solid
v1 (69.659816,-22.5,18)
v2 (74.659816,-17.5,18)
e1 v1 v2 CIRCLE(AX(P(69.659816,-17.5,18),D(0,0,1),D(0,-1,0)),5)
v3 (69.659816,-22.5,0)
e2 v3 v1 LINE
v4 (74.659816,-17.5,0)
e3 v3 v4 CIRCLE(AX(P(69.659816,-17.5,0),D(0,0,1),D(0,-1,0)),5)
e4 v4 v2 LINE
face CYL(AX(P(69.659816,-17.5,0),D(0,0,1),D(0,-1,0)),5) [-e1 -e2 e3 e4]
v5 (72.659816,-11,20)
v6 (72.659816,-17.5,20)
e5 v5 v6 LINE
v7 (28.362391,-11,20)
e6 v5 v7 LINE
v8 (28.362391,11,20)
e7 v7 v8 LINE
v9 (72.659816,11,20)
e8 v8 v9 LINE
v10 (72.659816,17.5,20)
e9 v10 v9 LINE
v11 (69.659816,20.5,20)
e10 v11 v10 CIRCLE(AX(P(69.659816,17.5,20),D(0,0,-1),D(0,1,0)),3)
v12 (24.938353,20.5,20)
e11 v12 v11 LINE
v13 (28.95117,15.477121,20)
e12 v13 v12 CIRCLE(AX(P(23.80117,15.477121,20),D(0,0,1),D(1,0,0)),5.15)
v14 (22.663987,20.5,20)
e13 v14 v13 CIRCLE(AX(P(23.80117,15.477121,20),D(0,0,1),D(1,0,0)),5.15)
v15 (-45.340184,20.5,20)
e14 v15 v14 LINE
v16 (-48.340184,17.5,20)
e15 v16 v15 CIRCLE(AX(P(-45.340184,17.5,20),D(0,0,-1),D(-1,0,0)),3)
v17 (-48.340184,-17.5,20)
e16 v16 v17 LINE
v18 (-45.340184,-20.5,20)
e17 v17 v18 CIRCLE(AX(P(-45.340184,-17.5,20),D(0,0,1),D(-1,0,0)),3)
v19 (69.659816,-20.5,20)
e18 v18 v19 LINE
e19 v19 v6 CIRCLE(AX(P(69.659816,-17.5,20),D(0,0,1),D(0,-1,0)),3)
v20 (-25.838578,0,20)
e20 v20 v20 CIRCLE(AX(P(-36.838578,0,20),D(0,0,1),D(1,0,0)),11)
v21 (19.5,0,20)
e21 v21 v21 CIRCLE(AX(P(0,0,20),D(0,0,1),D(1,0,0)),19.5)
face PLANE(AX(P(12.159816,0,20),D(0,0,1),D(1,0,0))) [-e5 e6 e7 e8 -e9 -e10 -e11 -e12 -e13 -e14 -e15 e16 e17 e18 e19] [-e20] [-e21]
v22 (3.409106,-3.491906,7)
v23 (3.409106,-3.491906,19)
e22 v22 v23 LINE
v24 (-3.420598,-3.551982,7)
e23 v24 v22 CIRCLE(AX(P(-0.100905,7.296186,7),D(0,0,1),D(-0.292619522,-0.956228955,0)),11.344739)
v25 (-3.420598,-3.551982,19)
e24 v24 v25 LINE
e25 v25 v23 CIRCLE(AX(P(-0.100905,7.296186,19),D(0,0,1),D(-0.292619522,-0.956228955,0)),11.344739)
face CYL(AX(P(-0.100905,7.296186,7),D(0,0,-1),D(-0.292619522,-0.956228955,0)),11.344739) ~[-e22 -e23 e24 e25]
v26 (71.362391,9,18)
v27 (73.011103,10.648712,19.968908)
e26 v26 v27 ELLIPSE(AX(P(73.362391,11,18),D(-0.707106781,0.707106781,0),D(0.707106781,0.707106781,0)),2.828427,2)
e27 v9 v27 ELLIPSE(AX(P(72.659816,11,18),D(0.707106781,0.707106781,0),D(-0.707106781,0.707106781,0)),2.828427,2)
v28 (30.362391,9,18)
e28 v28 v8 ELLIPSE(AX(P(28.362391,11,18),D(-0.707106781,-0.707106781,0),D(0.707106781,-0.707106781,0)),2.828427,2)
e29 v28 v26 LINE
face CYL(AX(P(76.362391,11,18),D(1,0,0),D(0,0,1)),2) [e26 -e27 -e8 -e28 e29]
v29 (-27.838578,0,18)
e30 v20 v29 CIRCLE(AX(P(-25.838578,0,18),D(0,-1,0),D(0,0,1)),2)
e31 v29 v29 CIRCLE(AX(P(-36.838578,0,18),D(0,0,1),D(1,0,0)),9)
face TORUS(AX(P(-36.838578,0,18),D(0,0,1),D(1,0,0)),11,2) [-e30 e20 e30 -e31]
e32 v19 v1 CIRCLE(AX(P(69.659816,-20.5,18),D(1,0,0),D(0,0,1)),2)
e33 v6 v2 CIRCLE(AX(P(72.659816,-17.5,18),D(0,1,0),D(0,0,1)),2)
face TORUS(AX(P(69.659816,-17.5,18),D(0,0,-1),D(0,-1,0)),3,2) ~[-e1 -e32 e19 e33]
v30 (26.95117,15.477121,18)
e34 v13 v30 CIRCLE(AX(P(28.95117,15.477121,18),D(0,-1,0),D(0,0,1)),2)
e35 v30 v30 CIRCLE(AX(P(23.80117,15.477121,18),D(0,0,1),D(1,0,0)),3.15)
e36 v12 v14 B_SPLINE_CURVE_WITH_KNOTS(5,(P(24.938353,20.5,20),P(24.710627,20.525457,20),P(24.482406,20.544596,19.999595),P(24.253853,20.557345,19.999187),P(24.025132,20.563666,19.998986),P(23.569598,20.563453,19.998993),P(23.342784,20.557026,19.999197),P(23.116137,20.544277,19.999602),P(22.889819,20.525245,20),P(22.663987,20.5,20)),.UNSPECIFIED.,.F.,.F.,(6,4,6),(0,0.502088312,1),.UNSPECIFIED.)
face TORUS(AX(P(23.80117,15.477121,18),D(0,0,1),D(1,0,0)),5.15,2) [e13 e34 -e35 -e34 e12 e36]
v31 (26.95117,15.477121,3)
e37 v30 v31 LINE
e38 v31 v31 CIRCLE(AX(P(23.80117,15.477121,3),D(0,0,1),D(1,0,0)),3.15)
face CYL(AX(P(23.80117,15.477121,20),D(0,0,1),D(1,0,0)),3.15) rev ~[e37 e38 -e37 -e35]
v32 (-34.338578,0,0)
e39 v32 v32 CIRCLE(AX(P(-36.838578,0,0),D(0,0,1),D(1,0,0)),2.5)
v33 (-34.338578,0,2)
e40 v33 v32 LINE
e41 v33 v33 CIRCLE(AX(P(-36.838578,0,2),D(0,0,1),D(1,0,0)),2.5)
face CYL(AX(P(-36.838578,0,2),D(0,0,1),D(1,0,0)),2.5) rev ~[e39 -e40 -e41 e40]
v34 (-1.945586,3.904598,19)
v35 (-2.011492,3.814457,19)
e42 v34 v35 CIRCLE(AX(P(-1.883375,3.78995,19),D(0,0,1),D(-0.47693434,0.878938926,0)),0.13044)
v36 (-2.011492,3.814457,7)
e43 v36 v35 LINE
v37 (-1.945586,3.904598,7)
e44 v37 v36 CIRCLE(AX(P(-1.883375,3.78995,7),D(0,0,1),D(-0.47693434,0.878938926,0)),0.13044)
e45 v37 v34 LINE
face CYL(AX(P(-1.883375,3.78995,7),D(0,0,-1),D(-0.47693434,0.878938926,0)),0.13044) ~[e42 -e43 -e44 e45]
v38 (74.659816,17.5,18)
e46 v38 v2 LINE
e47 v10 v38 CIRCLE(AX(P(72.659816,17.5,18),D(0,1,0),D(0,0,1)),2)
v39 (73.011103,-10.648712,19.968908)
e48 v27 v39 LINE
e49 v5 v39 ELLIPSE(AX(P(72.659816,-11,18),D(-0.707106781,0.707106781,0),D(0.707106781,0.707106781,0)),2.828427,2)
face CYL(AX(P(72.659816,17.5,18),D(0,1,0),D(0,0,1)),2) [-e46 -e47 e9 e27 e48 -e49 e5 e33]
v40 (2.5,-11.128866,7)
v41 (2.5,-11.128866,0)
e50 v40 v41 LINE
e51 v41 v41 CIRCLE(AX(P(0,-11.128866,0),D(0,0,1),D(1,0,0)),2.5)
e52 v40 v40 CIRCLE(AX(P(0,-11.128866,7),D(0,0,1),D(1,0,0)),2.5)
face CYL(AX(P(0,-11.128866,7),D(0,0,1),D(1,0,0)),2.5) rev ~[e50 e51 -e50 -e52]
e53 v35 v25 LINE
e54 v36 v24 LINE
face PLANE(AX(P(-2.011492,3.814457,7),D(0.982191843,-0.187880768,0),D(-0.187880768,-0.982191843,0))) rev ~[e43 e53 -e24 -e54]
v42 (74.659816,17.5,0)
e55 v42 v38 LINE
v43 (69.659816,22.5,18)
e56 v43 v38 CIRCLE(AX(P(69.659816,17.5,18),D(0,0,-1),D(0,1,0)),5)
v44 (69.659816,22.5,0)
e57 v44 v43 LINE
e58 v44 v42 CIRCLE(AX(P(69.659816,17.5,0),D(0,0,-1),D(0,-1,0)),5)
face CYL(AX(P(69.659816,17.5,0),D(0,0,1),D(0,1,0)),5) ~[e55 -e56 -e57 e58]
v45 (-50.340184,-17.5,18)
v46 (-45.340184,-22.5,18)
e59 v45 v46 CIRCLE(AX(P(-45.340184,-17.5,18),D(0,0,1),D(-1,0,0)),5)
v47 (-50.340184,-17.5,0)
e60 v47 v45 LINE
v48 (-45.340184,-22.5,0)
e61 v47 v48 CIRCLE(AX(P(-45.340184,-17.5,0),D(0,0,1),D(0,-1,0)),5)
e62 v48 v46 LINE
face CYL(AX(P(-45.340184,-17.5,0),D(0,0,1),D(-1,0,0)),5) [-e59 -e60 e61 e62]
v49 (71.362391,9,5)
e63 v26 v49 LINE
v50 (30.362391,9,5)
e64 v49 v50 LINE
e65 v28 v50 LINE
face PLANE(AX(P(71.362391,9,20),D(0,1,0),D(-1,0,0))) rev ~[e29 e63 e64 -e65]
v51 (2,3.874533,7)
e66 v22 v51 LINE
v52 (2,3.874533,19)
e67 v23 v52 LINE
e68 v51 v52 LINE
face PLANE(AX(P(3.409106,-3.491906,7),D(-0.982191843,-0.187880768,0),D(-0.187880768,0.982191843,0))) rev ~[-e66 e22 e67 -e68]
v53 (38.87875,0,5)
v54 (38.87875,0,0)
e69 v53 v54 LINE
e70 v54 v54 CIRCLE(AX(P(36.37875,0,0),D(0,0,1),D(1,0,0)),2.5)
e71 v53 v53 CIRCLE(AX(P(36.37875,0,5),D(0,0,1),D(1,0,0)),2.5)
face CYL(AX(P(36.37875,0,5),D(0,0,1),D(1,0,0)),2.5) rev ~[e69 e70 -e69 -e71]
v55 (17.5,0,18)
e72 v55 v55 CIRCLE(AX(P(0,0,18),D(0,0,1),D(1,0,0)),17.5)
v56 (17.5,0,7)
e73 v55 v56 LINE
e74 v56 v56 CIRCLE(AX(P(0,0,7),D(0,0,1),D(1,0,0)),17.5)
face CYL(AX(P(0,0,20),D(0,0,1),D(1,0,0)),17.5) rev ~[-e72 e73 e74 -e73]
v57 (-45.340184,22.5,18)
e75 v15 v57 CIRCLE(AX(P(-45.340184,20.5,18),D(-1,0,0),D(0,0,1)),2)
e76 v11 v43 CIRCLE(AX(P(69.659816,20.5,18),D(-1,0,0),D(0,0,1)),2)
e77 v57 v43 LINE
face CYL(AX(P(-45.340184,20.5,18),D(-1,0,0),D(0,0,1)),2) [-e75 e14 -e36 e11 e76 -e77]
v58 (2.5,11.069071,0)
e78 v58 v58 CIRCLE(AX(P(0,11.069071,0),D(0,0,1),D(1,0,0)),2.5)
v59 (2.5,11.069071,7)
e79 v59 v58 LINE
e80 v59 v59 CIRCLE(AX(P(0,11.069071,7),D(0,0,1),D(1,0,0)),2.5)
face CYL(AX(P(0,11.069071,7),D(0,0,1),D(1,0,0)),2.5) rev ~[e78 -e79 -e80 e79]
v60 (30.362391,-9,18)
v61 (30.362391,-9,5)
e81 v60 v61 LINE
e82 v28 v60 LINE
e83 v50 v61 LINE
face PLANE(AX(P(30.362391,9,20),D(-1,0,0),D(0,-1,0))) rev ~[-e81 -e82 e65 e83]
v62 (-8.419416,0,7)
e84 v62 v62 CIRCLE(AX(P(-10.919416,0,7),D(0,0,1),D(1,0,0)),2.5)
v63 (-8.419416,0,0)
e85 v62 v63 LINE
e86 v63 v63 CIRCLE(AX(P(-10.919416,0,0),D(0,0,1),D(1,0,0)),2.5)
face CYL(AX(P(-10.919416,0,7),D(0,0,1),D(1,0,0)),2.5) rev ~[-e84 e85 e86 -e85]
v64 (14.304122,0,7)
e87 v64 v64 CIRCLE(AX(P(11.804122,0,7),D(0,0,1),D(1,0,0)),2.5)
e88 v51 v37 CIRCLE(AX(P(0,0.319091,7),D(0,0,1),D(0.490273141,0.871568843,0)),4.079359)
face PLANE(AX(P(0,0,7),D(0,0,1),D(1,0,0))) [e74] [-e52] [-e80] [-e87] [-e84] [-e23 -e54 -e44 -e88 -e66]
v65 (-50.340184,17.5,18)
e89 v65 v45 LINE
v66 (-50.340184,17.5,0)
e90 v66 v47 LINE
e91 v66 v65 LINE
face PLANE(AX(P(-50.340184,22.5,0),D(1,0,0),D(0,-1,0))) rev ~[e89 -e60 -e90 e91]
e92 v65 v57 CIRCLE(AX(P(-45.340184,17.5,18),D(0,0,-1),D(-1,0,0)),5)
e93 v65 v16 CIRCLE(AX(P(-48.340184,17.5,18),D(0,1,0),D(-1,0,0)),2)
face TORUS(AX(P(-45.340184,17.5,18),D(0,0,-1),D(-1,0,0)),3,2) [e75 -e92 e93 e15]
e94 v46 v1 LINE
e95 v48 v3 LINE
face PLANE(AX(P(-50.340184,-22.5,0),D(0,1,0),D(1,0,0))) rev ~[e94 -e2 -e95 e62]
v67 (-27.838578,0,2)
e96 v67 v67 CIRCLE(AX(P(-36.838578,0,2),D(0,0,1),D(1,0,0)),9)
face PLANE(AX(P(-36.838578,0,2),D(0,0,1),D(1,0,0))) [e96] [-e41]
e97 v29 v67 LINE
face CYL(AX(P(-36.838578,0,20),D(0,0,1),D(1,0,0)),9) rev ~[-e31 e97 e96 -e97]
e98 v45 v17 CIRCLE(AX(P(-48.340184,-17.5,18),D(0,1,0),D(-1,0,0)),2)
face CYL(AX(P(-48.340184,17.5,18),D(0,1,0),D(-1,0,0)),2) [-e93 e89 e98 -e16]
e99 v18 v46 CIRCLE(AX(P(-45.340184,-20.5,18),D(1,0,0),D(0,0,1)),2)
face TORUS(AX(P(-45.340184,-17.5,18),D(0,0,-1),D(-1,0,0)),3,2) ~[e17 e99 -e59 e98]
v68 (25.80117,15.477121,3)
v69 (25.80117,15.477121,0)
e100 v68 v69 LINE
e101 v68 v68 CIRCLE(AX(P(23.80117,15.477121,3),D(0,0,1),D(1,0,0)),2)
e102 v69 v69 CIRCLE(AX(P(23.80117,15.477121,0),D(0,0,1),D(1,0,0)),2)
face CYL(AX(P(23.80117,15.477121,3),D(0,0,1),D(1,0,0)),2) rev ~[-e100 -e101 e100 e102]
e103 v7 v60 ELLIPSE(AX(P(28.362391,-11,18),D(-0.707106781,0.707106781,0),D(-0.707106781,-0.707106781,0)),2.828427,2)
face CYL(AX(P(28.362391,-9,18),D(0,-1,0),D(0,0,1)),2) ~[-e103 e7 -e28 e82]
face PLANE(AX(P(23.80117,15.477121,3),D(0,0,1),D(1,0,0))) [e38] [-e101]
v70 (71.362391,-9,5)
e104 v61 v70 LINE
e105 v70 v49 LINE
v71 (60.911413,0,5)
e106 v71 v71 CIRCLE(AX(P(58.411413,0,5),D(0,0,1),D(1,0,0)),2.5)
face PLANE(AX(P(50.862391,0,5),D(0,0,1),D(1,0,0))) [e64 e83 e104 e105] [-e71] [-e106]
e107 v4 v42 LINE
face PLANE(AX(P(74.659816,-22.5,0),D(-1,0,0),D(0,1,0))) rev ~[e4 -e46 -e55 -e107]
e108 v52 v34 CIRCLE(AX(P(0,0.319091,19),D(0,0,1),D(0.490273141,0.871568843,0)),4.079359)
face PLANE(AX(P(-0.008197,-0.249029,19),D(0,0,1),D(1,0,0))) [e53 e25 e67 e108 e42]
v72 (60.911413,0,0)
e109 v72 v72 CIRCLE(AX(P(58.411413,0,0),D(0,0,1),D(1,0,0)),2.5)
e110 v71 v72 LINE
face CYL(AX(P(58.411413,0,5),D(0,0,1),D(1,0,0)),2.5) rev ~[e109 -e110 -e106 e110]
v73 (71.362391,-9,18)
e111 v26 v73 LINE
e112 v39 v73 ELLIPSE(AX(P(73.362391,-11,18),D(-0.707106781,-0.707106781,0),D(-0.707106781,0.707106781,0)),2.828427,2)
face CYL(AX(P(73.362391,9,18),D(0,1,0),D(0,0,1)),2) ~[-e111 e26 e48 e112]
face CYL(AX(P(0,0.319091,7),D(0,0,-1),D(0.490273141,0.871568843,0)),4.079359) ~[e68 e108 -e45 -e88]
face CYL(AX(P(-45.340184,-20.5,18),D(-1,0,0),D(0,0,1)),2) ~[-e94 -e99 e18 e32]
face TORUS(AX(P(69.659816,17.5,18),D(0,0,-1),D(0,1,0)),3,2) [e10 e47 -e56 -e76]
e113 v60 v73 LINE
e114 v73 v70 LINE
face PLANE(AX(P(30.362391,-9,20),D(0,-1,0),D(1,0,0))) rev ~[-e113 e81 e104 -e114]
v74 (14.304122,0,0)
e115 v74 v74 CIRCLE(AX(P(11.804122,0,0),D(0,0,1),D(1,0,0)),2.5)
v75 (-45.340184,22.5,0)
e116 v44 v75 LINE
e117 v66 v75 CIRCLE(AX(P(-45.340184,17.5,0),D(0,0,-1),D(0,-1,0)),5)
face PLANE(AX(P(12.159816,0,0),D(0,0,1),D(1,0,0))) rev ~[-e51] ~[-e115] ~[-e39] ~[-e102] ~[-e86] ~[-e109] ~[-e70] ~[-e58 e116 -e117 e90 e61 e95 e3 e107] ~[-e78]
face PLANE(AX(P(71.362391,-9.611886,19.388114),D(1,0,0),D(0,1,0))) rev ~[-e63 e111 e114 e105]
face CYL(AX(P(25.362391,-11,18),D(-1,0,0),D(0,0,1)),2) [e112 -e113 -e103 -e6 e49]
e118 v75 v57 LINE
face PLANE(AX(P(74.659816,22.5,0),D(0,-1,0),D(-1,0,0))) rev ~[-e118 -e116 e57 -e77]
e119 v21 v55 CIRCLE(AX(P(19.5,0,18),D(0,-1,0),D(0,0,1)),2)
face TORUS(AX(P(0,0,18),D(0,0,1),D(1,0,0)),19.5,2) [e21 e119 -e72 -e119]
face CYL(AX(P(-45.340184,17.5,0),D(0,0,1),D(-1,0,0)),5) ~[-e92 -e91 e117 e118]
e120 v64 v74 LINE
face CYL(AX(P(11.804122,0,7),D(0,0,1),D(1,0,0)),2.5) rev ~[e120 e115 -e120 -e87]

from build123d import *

# Parameters (mm, degrees)
F1_DEPTH      = 20
F3_R          = 9
F4_DEPTH      = 18
F5_R          = 17.5
F6_DEPTH      = 13
F8_DEPTH      = 12
F10_DEPTH     = 15
F11_R         = 3.15
F12_DEPTH     = 17
F13_R         = 5
F14_T1_DEPTH  = 35
F14_T3_DEPTH  = 115
F14_T5_DEPTH  = 41
F14_T7_DEPTH  = 18
F14_T10_ANGLE = 90
F14_T12_ANGLE = 90
F14_T14_ANGLE = 90
F14_T16_ANGLE = 90
F14_T27_DEPTH = 46
F14_T31_DEPTH = 23
F14_T38_DEPTH = 46
F14_T42_DEPTH = 23
F14_T49_DEPTH = 23
F14_T53_DEPTH = 46
F14_T60_DEPTH = 23
F14_T64_DEPTH = 46
F15_R         = 2.5
F16_DEPTH     = 25
F17_R         = 2.5
F18_DEPTH     = 25
F19_R         = 2
F20_DEPTH     = 25
F21_R         = 2.5
F22_DEPTH     = 25


# Not quite as in the source:
# - a fillet or chamfer that OpenCascade refuses, or shapes differently, is made with other operations: its cross-section is extruded or revolved along the edge and cut away or added
# - a feature names something its author has since deleted; it is built from what else it names


with BuildPart() as f1:
    # F0 (on Top) → F1 (new body)
    with BuildSketch(Plane.XY):
        Polygon((-50.3401843222, 22.5), (-50.3401843222, 0), (-50.3401843222, -22.5), (74.6598156778, -22.5), (74.6598156778, 22.5), align=None)
    extrude(amount=F1_DEPTH)

    # F3 (on offset) → F4 (cut)
    with BuildSketch(Plane.XY.offset(20)):
        with Locations((-36.838578499, 0)):
            Circle(F3_R)
    extrude(amount=-F4_DEPTH, mode=Mode.SUBTRACT)

    # F5 (on face) → F6 (cut)
    with BuildSketch(Plane.XY.offset(20)):
        Circle(F5_R)
    extrude(amount=-F6_DEPTH, mode=Mode.SUBTRACT)

    # F7 (on face) → F8 (join)
    with BuildSketch(Plane.XY.offset(7)):
        with BuildLine():
            Line((3.4091057572, -3.4919061418), (2, 3.8745326834))
            ThreePointArc((2, 3.8745326834), (0.0310836546, 4.3983310157), (-1.9455862415, 3.9045978994))
            ThreePointArc((-1.9455862415, 3.9045978994), (-1.9886724642, 3.8669361828), (-2.0114917871, 3.8144566059))
            Line((-2.0114917871, 3.8144566059), (-3.4205975443, -3.5519822192))
            ThreePointArc((-3.4205975443, -3.5519822192), (-0.0011175453, -4.0481144365), (3.4091057572, -3.4919061418))
        make_face()
    extrude(amount=F8_DEPTH)

    # F9 (on face) → F10 (cut)
    with BuildSketch(Plane.XY.offset(20)):
        Polygon((30.3623908478, 9), (30.3623908478, 0), (30.3623908478, -9), (71.3623908478, -9), (71.3623908478, 0), (71.3623908478, 9), align=None)
    extrude(amount=-F10_DEPTH, mode=Mode.SUBTRACT)

    # F11 (on face) → F12 (cut)
    with BuildSketch(Plane.XY.offset(20)):
        with Locations((23.8011702895, 15.4771208763)):
            Circle(F11_R)
    extrude(amount=-F12_DEPTH, mode=Mode.SUBTRACT)

    # F13
    f13_edges = [f1.edges().sort_by_distance(p)[0] for p in [
        (74.659816, -22.5, 10),
        (74.659816, 22.5, 10),
        (-50.340184, -22.5, 10),
        (-50.340184, 22.5, 10),
    ]]
    fillet(f13_edges, radius=F13_R)

    # F14: fillet of radius 2 on 15 edges, made by hand

    # F14_s2 → F14_t1 (cut)
    with BuildSketch(Plane.XZ.offset(-17.5)):
        with BuildLine():
            ThreePointArc((-50.3401843222, 18), (-49.7543978846, 19.4142135624), (-48.3401843222, 20))
            Line((-48.3401843222, 20), (-50.3401843222, 20))
            Line((-50.3401843222, 20), (-50.3401843222, 18))
        make_face()
        with BuildLine():
            ThreePointArc((72.6598156778, 20), (74.0740292402, 19.4142135624), (74.6598156778, 18))
            Line((74.6598156778, 18), (74.6598156778, 20))
            Line((74.6598156778, 20), (72.6598156778, 20))
        make_face()
    extrude(amount=F14_T1_DEPTH, mode=Mode.SUBTRACT)

    # F14_s4 → F14_t3 (cut)
    with BuildSketch(Plane.YZ.offset(-45.3401843222)):
        with BuildLine():
            ThreePointArc((-20.5, 20), (-21.9142135624, 19.4142135624), (-22.5, 18))
            Line((-22.5, 18), (-22.5, 20))
            Line((-22.5, 20), (-20.5, 20))
        make_face()
        with BuildLine():
            ThreePointArc((20.5, 20), (21.9142135624, 19.4142135624), (22.5, 18))
            Line((22.5, 18), (22.5, 20))
            Line((22.5, 20), (20.5, 20))
        make_face()
    extrude(amount=F14_T3_DEPTH, mode=Mode.SUBTRACT)

    # F14_s6 → F14_t5 (cut)
    with BuildSketch(Plane.YZ.offset(30.3623908478)):
        with BuildLine():
            ThreePointArc((-11, 20), (-9.5857864376, 19.4142135624), (-9, 18))
            Line((-9, 18), (-9, 20))
            Line((-9, 20), (-11, 20))
        make_face()
        with BuildLine():
            ThreePointArc((11, 20), (9.5857864376, 19.4142135624), (9, 18))
            Line((9, 18), (9, 20))
            Line((9, 20), (11, 20))
        make_face()
    extrude(amount=F14_T5_DEPTH, mode=Mode.SUBTRACT)

    # F14_s8 → F14_t7 (cut)
    with BuildSketch(Plane.XZ.offset(-9)):
        with BuildLine():
            ThreePointArc((28.3623908478, 20), (29.7766044102, 19.4142135624), (30.3623908478, 18))
            Line((30.3623908478, 18), (30.3623908478, 20))
            Line((30.3623908478, 20), (28.3623908478, 20))
        make_face()
        with BuildLine():
            ThreePointArc((73.3623908478, 20), (71.9481772854, 19.4142135624), (71.3623908478, 18))
            Line((71.3623908478, 18), (71.3623908478, 20))
            Line((71.3623908478, 20), (73.3623908478, 20))
        make_face()
    extrude(amount=F14_T7_DEPTH, mode=Mode.SUBTRACT)

    # F14_s9 → F14_t10 (revolve, cut)
    with BuildSketch(Plane.XZ.offset(17.5)):
        with BuildLine():
            ThreePointArc((-48.3401843222, 20), (-49.7543978846, 19.4142135624), (-50.3401843222, 18))
            Line((-50.3401843222, 18), (-50.3401843222, 20))
            Line((-50.3401843222, 20), (-48.3401843222, 20))
        make_face()
    revolve(axis=Axis((-45.3401843222, -17.5, 20), (0, 0, 1)), revolution_arc=F14_T10_ANGLE, mode=Mode.SUBTRACT)

    # F14_s11 → F14_t12 (revolve, cut)
    with BuildSketch(Plane.XZ.offset(-17.5)):
        with BuildLine():
            ThreePointArc((-48.3401843222, 20), (-49.7543978846, 19.4142135624), (-50.3401843222, 18))
            Line((-50.3401843222, 18), (-50.3401843222, 20))
            Line((-50.3401843222, 20), (-48.3401843222, 20))
        make_face()
    revolve(axis=Axis((-45.3401843222, 17.5, 20), (0, 0, -1)), revolution_arc=F14_T12_ANGLE, mode=Mode.SUBTRACT)

    # F14_s13 → F14_t14 (revolve, cut)
    with BuildSketch(Plane.YZ.offset(69.6598156778)):
        with BuildLine():
            ThreePointArc((-20.5, 20), (-21.9142135624, 19.4142135624), (-22.5, 18))
            Line((-22.5, 18), (-22.5, 20))
            Line((-22.5, 20), (-20.5, 20))
        make_face()
    revolve(axis=Axis((69.6598156778, -17.5, 20), (0, 0, 1)), revolution_arc=F14_T14_ANGLE, mode=Mode.SUBTRACT)

    # F14_s15 → F14_t16 (revolve, cut)
    with BuildSketch(Plane.YZ.offset(69.6598156778)):
        with BuildLine():
            ThreePointArc((20.5, 20), (21.9142135624, 19.4142135624), (22.5, 18))
            Line((22.5, 18), (22.5, 20))
            Line((22.5, 20), (20.5, 20))
        make_face()
    revolve(axis=Axis((69.6598156778, 17.5, 20), (0, 0, -1)), revolution_arc=F14_T16_ANGLE, mode=Mode.SUBTRACT)

    # F14_s17 → F14_t18 (revolve, cut)
    with BuildSketch(Plane.XZ):
        with BuildLine():
            ThreePointArc((-25.838578499, 20), (-27.2527920613, 19.4142135624), (-27.838578499, 18))
            Line((-27.838578499, 18), (-27.838578499, 20))
            Line((-27.838578499, 20), (-25.838578499, 20))
        make_face()
    revolve(axis=Axis((-36.838578499, 0, 20), (0, 0, 1)), mode=Mode.SUBTRACT)

    # F14_s19 → F14_t20 (revolve, cut)
    with BuildSketch(Plane.XZ):
        with BuildLine():
            ThreePointArc((19.5, 20), (18.0857864376, 19.4142135624), (17.5, 18))
            Line((17.5, 18), (17.5, 20))
            Line((17.5, 20), (19.5, 20))
        make_face()
    revolve(axis=Axis((0, 0, 20), (0, 0, 1)), mode=Mode.SUBTRACT)

    # F14_s21 → F14_t22 (revolve, cut)
    with BuildSketch(Plane.XZ.offset(-15.4771208763)):
        with BuildLine():
            ThreePointArc((28.9511702895, 20), (27.5369567271, 19.4142135624), (26.9511702895, 18))
            Line((26.9511702895, 18), (26.9511702895, 20))
            Line((26.9511702895, 20), (28.9511702895, 20))
        make_face()
    revolve(axis=Axis((23.8011702895, 15.4771208763, 20), (0, 0, 1)), mode=Mode.SUBTRACT)


with BuildPart() as f14_tool25:
    # F14_s26 → F14_t27 (new body)
    with BuildSketch(Plane.YZ.offset(25.3623908478)):
        with BuildLine():
            ThreePointArc((-11, 20), (-9.5857864376, 19.4142135624), (-9, 18))
            Line((-9, 18), (-9, 20))
            Line((-9, 20), (-11, 20))
        make_face()
    extrude(amount=F14_T27_DEPTH)

    split(bisect_by=Plane.YZ.offset(30.3623908478), keep=Keep.BOTTOM)


with BuildPart() as f14_tool29:
    # F14_s30 → F14_t31 (new body)
    with BuildSketch(Plane.XZ.offset(14)):
        with BuildLine():
            ThreePointArc((28.3623908478, 20), (29.7766044102, 19.4142135624), (30.3623908478, 18))
            Line((30.3623908478, 18), (30.3623908478, 20))
            Line((30.3623908478, 20), (28.3623908478, 20))
        make_face()
    extrude(amount=-F14_T31_DEPTH)

    split(bisect_by=Plane.XZ.offset(9), keep=Keep.TOP)


with BuildPart() as f14_tool25_1:
    add(f14_tool25.part)

    # F14_t33: intersect F14_tool29
    add(f14_tool29.part, mode=Mode.INTERSECT)


with BuildPart() as f1_1:
    add(f1.part)

    # F14_t23: cut F14_tool25
    add(f14_tool25_1.part, mode=Mode.SUBTRACT)


with BuildPart() as f14_tool36:
    # F14_s37 → F14_t38 (new body)
    with BuildSketch(Plane.YZ.offset(30.3623908478)):
        with BuildLine():
            ThreePointArc((-11, 20), (-9.5857864376, 19.4142135624), (-9, 18))
            Line((-9, 18), (-9, 20))
            Line((-9, 20), (-11, 20))
        make_face()
    extrude(amount=F14_T38_DEPTH)

    split(bisect_by=Plane.YZ.offset(71.3623908478), keep=Keep.TOP)


with BuildPart() as f14_tool40:
    # F14_s41 → F14_t42 (new body)
    with BuildSketch(Plane.XZ.offset(-9)):
        with BuildLine():
            ThreePointArc((73.3623908478, 20), (71.9481772854, 19.4142135624), (71.3623908478, 18))
            Line((71.3623908478, 18), (71.3623908478, 20))
            Line((71.3623908478, 20), (73.3623908478, 20))
        make_face()
    extrude(amount=F14_T42_DEPTH)

    split(bisect_by=Plane.XZ.offset(9), keep=Keep.TOP)


with BuildPart() as f14_tool36_1:
    add(f14_tool36.part)

    # F14_t44: intersect F14_tool40
    add(f14_tool40.part, mode=Mode.INTERSECT)


with BuildPart() as f1_2:
    add(f1_1.part)

    # F14_t34: cut F14_tool36
    add(f14_tool36_1.part, mode=Mode.SUBTRACT)


with BuildPart() as f14_tool47:
    # F14_s48 → F14_t49 (new body)
    with BuildSketch(Plane.XZ.offset(9)):
        with BuildLine():
            ThreePointArc((28.3623908478, 20), (29.7766044102, 19.4142135624), (30.3623908478, 18))
            Line((30.3623908478, 18), (30.3623908478, 20))
            Line((30.3623908478, 20), (28.3623908478, 20))
        make_face()
    extrude(amount=-F14_T49_DEPTH)

    split(bisect_by=Plane.XZ.offset(-9), keep=Keep.BOTTOM)


with BuildPart() as f14_tool51:
    # F14_s52 → F14_t53 (new body)
    with BuildSketch(Plane.YZ.offset(71.3623908478)):
        with BuildLine():
            ThreePointArc((11, 20), (9.5857864376, 19.4142135624), (9, 18))
            Line((9, 18), (9, 20))
            Line((9, 20), (11, 20))
        make_face()
    extrude(amount=-F14_T53_DEPTH)

    split(bisect_by=Plane.YZ.offset(30.3623908478), keep=Keep.BOTTOM)


with BuildPart() as f14_tool47_1:
    add(f14_tool47.part)

    # F14_t55: intersect F14_tool51
    add(f14_tool51.part, mode=Mode.INTERSECT)


with BuildPart() as f1_3:
    add(f1_2.part)

    # F14_t45: cut F14_tool47
    add(f14_tool47_1.part, mode=Mode.SUBTRACT)


with BuildPart() as f14_tool58:
    # F14_s59 → F14_t60 (new body)
    with BuildSketch(Plane.XZ.offset(-14)):
        with BuildLine():
            ThreePointArc((73.3623908478, 20), (71.9481772854, 19.4142135624), (71.3623908478, 18))
            Line((71.3623908478, 18), (71.3623908478, 20))
            Line((71.3623908478, 20), (73.3623908478, 20))
        make_face()
    extrude(amount=F14_T60_DEPTH)

    split(bisect_by=Plane.XZ.offset(-9), keep=Keep.BOTTOM)


with BuildPart() as f14_tool62:
    # F14_s63 → F14_t64 (new body)
    with BuildSketch(Plane.YZ.offset(76.3623908478)):
        with BuildLine():
            ThreePointArc((11, 20), (9.5857864376, 19.4142135624), (9, 18))
            Line((9, 18), (9, 20))
            Line((9, 20), (11, 20))
        make_face()
    extrude(amount=-F14_T64_DEPTH)

    split(bisect_by=Plane.YZ.offset(71.3623908478), keep=Keep.TOP)


with BuildPart() as f14_tool58_1:
    add(f14_tool58.part)

    # F14_t66: intersect F14_tool62
    add(f14_tool62.part, mode=Mode.INTERSECT)


with BuildPart() as f1_4:
    add(f1_3.part)

    # F14_t56: cut F14_tool58
    add(f14_tool58_1.part, mode=Mode.SUBTRACT)

    # F15 (on face) → F16 (cut)
    with BuildSketch(Plane.XY.offset(2)):
        with Locations((-36.838578499, 0)):
            Circle(F15_R)
    extrude(amount=-F16_DEPTH, mode=Mode.SUBTRACT)

    # F17 (on face) → F18 (cut)
    with BuildSketch(Plane.XY.offset(7)):
        with Locations((0, 11.0690705478)):
            Circle(F17_R)
        with Locations((-10.9194163233, 0)):
            Circle(F17_R)
        with Locations((0, -11.1288661137)):
            Circle(F17_R)
        with Locations((11.8041224778, 0)):
            Circle(F17_R)
    extrude(amount=-F18_DEPTH, mode=Mode.SUBTRACT)

    # F19 (on face) → F20 (cut)
    with BuildSketch(Plane.XY.offset(3)):
        with Locations((23.8011702895, 15.4771208763)):
            Circle(F19_R)
    extrude(amount=-F20_DEPTH, mode=Mode.SUBTRACT)

    # F21 (on face) → F22 (cut)
    with BuildSketch(Plane.XY.offset(5)):
        with Locations((36.3787501116, 0)):
            Circle(F21_R)
        with Locations((58.4114133848, 0)):
            Circle(F21_R)
    extrude(amount=-F22_DEPTH, mode=Mode.SUBTRACT)


solid = f1_4.part
